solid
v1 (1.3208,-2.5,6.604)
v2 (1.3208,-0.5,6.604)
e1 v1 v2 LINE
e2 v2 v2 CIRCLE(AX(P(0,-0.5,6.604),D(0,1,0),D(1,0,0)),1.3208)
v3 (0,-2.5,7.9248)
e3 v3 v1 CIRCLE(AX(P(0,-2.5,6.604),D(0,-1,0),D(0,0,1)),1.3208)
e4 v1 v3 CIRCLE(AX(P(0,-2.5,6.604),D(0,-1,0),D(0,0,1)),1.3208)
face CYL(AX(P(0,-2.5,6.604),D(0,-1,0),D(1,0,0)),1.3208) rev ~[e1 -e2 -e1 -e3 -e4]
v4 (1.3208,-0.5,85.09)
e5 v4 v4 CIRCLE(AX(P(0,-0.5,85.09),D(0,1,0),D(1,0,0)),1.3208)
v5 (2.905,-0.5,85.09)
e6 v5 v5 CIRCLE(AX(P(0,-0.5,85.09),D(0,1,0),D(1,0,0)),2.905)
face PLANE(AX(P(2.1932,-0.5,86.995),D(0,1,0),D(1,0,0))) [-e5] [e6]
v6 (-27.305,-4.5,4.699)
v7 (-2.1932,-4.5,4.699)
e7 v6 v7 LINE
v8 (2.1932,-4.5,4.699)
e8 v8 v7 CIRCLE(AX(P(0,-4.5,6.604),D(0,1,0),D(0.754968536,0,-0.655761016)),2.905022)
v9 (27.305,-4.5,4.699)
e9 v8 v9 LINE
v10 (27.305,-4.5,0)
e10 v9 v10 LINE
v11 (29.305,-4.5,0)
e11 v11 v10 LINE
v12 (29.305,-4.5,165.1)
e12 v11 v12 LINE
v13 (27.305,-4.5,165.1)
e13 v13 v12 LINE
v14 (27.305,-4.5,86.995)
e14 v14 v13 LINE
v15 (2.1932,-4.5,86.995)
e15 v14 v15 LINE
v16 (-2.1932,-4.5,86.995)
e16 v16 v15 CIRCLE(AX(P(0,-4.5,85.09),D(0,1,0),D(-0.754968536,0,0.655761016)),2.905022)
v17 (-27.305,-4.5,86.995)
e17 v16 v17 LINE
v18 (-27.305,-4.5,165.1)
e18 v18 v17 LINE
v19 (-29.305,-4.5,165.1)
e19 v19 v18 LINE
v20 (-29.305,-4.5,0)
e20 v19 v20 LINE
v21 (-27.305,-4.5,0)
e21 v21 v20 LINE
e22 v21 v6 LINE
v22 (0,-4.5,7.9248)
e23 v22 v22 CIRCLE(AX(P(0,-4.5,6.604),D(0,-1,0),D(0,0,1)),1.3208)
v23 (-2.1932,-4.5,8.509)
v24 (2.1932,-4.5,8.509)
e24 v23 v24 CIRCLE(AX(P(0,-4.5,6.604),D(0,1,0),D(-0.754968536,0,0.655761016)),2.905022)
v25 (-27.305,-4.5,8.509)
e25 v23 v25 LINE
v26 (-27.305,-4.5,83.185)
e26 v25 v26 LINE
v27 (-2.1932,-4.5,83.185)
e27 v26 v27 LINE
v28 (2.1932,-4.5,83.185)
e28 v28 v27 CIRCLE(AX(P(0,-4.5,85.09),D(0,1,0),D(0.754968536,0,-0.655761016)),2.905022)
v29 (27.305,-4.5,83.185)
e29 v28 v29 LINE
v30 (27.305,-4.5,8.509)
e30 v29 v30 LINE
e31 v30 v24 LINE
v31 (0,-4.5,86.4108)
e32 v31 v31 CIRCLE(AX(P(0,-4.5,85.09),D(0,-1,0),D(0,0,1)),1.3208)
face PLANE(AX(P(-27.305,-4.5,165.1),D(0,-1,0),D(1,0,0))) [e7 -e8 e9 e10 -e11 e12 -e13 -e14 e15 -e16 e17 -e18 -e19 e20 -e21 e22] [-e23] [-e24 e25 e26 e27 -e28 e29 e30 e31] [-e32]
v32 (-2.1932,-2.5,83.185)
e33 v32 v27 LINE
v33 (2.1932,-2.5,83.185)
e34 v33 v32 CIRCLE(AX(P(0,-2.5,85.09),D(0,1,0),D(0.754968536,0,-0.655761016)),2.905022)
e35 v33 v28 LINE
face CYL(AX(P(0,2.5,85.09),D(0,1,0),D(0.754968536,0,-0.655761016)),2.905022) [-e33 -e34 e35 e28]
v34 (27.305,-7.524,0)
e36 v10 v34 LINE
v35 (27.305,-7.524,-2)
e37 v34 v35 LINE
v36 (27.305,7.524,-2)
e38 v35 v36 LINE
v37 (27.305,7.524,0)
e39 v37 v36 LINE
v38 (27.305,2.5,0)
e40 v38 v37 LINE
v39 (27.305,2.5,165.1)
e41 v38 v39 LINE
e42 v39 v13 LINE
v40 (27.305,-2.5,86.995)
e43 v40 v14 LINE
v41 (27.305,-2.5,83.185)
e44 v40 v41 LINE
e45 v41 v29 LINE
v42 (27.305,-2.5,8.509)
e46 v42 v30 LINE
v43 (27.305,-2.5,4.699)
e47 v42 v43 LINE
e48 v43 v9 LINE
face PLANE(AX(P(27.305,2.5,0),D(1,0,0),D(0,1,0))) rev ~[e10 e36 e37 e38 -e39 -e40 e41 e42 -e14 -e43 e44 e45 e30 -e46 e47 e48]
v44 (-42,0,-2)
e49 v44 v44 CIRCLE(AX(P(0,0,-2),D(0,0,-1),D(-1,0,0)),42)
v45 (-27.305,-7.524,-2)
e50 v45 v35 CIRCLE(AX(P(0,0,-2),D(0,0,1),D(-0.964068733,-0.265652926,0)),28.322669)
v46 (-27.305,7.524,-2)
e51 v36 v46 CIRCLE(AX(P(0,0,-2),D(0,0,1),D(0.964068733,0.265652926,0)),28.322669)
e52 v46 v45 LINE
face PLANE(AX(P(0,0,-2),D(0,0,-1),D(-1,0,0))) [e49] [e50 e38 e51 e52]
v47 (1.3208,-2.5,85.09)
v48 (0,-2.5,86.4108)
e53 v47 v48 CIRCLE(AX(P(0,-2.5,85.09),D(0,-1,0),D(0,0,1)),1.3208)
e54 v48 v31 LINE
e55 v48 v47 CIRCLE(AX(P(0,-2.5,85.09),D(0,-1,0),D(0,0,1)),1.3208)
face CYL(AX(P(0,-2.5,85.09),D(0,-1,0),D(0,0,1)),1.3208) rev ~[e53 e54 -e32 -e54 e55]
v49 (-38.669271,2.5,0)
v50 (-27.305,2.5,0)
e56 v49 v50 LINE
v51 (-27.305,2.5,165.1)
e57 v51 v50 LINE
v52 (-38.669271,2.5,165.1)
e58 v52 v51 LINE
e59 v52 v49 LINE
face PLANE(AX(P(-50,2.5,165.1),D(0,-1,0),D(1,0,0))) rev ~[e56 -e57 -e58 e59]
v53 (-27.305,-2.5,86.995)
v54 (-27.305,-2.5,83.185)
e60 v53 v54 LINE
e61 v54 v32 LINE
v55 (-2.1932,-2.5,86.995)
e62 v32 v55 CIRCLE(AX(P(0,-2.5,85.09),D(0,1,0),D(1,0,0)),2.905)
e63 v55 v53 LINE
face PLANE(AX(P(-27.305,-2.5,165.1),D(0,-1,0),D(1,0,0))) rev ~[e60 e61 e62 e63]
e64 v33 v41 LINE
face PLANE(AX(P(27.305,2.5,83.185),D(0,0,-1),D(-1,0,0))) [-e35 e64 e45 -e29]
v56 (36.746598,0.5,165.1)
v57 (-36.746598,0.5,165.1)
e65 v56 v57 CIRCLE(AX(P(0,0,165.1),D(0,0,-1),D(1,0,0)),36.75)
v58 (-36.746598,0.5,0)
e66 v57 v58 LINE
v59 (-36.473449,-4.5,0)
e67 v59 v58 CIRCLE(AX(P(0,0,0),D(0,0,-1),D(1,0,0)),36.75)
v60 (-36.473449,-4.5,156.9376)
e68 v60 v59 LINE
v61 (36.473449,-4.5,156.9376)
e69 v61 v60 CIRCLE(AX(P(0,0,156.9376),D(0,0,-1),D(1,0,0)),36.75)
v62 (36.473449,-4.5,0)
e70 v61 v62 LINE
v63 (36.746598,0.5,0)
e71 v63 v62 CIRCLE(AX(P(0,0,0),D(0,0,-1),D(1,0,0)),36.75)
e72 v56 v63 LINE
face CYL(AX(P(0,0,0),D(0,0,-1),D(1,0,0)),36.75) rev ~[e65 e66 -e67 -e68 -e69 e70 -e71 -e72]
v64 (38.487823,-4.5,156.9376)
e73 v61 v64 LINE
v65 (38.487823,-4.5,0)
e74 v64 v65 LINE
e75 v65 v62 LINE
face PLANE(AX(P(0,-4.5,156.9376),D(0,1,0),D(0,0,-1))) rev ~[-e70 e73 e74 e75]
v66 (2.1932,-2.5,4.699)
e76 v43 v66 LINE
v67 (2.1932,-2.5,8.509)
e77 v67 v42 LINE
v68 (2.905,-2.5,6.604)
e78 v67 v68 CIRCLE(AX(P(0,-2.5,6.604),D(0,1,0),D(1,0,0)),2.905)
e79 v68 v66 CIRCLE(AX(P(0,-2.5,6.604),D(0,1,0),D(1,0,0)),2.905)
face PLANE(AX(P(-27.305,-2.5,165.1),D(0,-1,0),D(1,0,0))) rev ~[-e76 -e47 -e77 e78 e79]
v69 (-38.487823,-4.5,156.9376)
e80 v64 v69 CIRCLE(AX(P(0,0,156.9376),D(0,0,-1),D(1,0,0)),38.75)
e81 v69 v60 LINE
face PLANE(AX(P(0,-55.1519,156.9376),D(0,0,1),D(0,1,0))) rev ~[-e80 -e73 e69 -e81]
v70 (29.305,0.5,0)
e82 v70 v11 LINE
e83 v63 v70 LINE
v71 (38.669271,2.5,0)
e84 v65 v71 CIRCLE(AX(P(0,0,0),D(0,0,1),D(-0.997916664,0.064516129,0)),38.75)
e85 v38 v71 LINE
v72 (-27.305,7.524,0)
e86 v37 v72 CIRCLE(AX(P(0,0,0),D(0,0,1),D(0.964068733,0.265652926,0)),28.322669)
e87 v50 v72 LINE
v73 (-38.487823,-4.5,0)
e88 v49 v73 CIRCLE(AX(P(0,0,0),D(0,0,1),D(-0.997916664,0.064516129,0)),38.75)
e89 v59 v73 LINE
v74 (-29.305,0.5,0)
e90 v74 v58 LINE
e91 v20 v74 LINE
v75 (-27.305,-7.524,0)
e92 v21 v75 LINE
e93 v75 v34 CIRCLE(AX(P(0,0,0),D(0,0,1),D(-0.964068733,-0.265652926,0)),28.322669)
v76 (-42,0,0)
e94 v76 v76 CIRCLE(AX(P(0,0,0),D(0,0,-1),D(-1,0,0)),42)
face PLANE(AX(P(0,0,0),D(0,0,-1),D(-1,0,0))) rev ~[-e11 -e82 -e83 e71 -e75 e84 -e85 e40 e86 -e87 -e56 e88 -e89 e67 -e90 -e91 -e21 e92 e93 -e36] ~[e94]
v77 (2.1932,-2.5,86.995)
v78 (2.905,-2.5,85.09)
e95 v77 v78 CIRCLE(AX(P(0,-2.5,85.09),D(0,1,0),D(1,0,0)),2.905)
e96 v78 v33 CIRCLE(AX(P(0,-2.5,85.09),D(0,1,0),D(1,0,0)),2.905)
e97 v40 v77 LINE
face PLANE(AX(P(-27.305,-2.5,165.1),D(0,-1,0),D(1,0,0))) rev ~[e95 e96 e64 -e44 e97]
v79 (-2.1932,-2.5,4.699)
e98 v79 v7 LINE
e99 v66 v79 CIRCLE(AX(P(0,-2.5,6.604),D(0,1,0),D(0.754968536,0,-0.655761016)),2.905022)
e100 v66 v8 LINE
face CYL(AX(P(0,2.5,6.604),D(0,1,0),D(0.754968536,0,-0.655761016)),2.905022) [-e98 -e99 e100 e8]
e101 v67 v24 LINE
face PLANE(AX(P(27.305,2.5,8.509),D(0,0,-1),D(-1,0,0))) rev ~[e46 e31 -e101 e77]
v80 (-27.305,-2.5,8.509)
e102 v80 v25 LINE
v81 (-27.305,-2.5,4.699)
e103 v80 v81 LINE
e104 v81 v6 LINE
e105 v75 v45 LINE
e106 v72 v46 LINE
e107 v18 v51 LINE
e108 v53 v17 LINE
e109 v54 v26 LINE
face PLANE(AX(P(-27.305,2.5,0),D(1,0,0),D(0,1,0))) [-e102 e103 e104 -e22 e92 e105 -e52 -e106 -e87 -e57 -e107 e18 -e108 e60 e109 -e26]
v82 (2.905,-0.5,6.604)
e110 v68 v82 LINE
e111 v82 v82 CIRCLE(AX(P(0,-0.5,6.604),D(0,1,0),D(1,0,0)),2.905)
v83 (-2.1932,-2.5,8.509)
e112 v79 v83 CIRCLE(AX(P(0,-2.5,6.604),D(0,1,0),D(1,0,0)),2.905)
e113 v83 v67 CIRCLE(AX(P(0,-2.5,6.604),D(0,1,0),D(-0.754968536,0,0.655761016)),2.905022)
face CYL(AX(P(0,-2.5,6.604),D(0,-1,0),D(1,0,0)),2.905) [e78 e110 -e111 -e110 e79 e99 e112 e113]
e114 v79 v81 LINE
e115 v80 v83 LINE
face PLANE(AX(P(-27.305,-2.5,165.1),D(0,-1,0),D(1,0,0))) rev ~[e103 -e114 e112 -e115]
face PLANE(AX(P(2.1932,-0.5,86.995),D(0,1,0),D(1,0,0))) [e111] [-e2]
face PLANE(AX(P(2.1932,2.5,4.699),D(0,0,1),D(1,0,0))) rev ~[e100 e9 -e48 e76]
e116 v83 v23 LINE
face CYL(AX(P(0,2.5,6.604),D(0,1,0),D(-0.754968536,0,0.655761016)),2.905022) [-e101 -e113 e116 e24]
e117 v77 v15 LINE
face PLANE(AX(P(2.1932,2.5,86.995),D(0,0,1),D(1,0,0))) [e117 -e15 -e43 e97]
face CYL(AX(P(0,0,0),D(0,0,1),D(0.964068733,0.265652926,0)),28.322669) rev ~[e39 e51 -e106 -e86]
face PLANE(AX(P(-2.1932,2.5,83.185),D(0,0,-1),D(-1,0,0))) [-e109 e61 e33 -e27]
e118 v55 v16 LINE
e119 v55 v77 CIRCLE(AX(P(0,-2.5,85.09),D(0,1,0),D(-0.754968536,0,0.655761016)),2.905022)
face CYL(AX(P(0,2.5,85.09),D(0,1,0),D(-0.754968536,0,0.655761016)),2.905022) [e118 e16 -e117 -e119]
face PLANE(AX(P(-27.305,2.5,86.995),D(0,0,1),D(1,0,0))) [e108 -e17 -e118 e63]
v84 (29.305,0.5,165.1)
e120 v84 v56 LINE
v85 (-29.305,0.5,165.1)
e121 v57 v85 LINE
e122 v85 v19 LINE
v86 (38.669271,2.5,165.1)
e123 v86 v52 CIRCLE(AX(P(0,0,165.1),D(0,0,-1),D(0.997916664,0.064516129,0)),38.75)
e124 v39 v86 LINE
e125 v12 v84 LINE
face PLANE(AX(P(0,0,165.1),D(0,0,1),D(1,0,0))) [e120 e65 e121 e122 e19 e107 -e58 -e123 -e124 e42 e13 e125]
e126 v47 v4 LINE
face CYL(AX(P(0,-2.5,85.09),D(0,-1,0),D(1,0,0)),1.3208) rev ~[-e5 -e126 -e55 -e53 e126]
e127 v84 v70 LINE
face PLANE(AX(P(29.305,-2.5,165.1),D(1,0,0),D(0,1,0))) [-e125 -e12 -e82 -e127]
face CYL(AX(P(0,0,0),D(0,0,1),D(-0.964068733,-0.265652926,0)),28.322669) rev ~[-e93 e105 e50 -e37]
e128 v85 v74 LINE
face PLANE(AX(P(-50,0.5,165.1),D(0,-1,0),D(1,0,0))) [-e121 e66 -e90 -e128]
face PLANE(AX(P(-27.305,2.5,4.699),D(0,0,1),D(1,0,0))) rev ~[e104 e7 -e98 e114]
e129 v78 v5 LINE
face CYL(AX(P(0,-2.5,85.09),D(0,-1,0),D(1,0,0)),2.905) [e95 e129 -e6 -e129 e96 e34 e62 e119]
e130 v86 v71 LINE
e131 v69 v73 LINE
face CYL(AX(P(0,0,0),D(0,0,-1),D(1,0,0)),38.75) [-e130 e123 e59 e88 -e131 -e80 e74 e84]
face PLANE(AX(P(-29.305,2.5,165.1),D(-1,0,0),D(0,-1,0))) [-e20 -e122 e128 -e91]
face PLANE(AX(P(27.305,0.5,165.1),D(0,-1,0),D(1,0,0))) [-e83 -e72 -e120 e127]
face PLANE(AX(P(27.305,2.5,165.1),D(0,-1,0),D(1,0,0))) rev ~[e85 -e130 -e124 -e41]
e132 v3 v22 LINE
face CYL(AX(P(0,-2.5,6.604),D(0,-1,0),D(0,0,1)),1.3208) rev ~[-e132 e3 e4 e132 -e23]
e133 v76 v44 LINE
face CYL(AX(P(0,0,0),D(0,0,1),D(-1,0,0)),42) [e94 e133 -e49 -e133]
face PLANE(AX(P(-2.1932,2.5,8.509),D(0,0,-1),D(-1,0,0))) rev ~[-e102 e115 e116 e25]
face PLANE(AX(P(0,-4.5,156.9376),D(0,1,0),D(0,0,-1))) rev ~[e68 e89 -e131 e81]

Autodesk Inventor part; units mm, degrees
ref_plane "YZ Plane" through (0, 0, 0) normal (1, 0, 0) x (0, 1, 0)
ref_plane "XZ Plane" through (0, 0, 0) normal (0, 1, 0) x (-1, 0, 0)
ref_plane "XY Plane" through (0, 0, 0) normal (0, 0, 1) x (1, 0, 0)
sketch "Sketch1" plane through (0, 0, 0) normal (0, 0, 1) x (1, 0, 0)
  circle A0 centre (0, 0) radius 38.75
  dimension "d0" = 77.5
extrude "Extrusion1" add sketch "Sketch1" along normal blind 165.1
sketch "Sketch2" plane through (0, 0, 165.1) normal (0, 0, 1) x (1, 0, 0)
  line L0 (-27.305, -2.5) -> (27.305, -2.5)
  line L1 (27.305, -2.5) -> (27.305, 2.5)
  line L2 (27.305, 2.5) -> (-27.305, 2.5)
  line L3 (-27.305, 2.5) -> (-27.305, -2.5)
  line L4 (-27.305, -2.5) -> (27.305, 2.5) construction
  line L5 (27.305, -2.5) -> (-27.305, 2.5) construction
  line L6 (0, 2.5) -> (41.5863, 2.5)
  line L7 (41.5863, 2.5) -> (41.5863, 42.5)
  line L8 (41.5863, 42.5) -> (0, 42.5)
  line L9 (0, 42.5) -> (0, 2.5)
  line L10 (0, 42.5) -> (-50, 42.5)
  line L11 (-50, 42.5) -> (-50, 2.5)
  line L12 (-50, 2.5) -> (0, 2.5)
  line L13 (0, 2.5) -> (0, 42.5)
  point P0 (0, 0)
  point P1 (-27.305, 2.5)
  dimension "d3" = 54.61
  dimension "d4" = 5
extrude "Extrusion2" cut sketch "Sketch2" against normal through all
sketch "Sketch3" plane through (0, 0, 0) normal (0, 0, -1) x (-1, 0, 0)
  circle A0 centre (0, 0) radius 42
extrude "Extrusion3" add sketch "Sketch3" along normal blind 2
sketch "Sketch4" plane through (-27.305, -2.5, 165.1) normal (0, 1, 0) x (1, 0, 0)
  line L0 (0, 165.1) -> (54.61, 165.1) projected
  line L1 (0, 0) -> (0, 165.1) projected
  point P0 (27.305, 165.1)
  point P1 (27.305, 158.496)
  dimension "d9" = 6.604
  dimension "d10" = 27.305
hole "Hole1" at (0, -2.5, 6.604) direction (0, -1, 0) diameter 2.6416 depth 10.979 thread size "6-32 UNC" class "2B" standard "ANSI Unified Screw Threads"
sketch "Sketch5" plane through (-27.305, -2.5, 165.1) normal (0, 1, 0) x (1, 0, 0)
  line L0 (0, 165.1) -> (54.61, 165.1) projected
  line L1 (0, 0) -> (0, 165.1) projected
  point P0 (27.305, 165.1)
  point P1 (27.305, 80.01)
  dimension "d18" = 85.09
  dimension "d26" = 27.305
hole "Hole2" at (0, -2.5, 85.09) direction (0, -1, 0) diameter 2.6416 depth 10.979 thread size "6-32 UNC" class "2B" standard "ANSI Unified Screw Threads"
shell "Shell1" thickness 2 removed faces 1 at (1.4054, -14.5066, 165.1)
sketch "Sketch6" plane through (27.305, 2.5, 165.1) normal (0, 1, 0) x (1, 0, 0)
  circle A0 centre (-27.305, 158.496) radius 1.3208 projected
  circle A1 centre (-27.305, 80.01) radius 1.3208 projected
  line L0 (0, 79.02) -> (0, 81)
  line L1 (-54.61, 81) -> (-54.61, 79.02)
  line L2 (0, 160.401) -> (0, 156.591)
  line L3 (-54.61, 156.591) -> (-54.61, 160.401)
  line L4 (-54.61, 160.401) -> (0, 156.591) construction
  line L5 (0, 160.401) -> (-54.61, 156.591) construction
  line L6 (0, 78.105) -> (0, 81.915)
  line L7 (-54.61, 81.915) -> (-54.61, 78.105)
  line L8 (-54.61, 78.105) -> (0, 81.915) construction
  line L9 (0, 78.105) -> (-54.61, 81.915) construction
  line L10 (-54.61, 165.1) -> (0, 165.1)
  line L11 (0, 165.1) -> (0, 0)
  line L12 (0, 0) -> (-54.61, 0)
  line L13 (-54.61, 0) -> (-54.61, 165.1)
  arc A2 (-25.1118, 160.401) -> (-29.4982, 160.401) centre (-27.305, 158.496) ccw
  arc A3 (-29.4982, 156.591) -> (-25.1118, 156.591) centre (-27.305, 158.496) ccw
  line L14 (-54.61, 160.401) -> (-29.4982, 160.401)
  line L15 (-25.1118, 160.401) -> (0, 160.401)
  line L16 (0, 156.591) -> (-25.1118, 156.591)
  line L17 (-29.4982, 156.591) -> (-54.61, 156.591)
  line L18 (0, 81.915) -> (-25.1118, 81.915)
  line L19 (-29.4982, 81.915) -> (-54.61, 81.915)
  line L20 (-54.61, 78.105) -> (-29.4982, 78.105)
  line L21 (-25.1118, 78.105) -> (0, 78.105)
  arc A4 (-25.1118, 81.915) -> (-29.4982, 81.915) centre (-27.305, 80.01) ccw
  arc A5 (-29.4982, 78.105) -> (-25.1118, 78.105) centre (-27.305, 80.01) ccw
  point P0 (-27.305, 165.1)
extrude "Extrusion4" cut sketch "Sketch6" against normal blind 12.5 contours L11 L12 L13 L20 A5 L21 | L18 A4 L19 L13 L17 A3 L16 L11 | L15 A2 L14 L13 L10 L11
sketch "Sketch7" plane through (0, 0, 0) normal (1, 0, 0) x (0, 1, 0)
  line L0 (-4.5, 165.1) -> (-4.5, 0) projected
  line L1 (-4.5, 0) -> (-49, 0)
  line L2 (0.5, 0) -> (-4.5, 0) projected
  line L3 (-4.5, 0) -> (-55.1519, 0)
  line L4 (-55.1519, 0) -> (-55.1519, 156.9376)
  line L5 (-55.1519, 156.9376) -> (-4.5, 156.9376)
  line L6 (-4.5, 156.9376) -> (-4.5, 0)
  line L7 (-4.5, 0) -> (-56.1519, 0)
  line L8 (-56.1519, 0) -> (-56.1519, 0)
  line L9 (-56.1519, 0) -> (-4.5, 0)
  line L10 (-4.5, 0) -> (-4.5, 0)
  point P0 (0, 0)
  point P1 (-4.5, 156.9376)
  point P2 (-55.1519, 1)
  point P3 (-4.5, 0)
extrude "Extrusion5" cut sketch "Sketch7" along normal through all both and the other way through all
sketch "Sketch9" plane through (0, 0, 0) normal (0, 0, 1) x (1, 0, 0)
  line L0 (-27.305, -4.5) -> (-27.305, 2.5) projected
  line L1 (-27.305, -1) -> (-27.305, 7.524)
  line L2 (-27.305, -4.5) -> (-27.305, -7.524)
  line L3 (27.305, 2.5) -> (27.305, -4.5) projected
  line L4 (27.305, -1) -> (27.305, 7.524)
  line L5 (27.305, 7.524) -> (27.305, -7.524)
  arc A0 (-27.305, -7.524) -> (27.305, -7.524) centre (0, 0) ccw
  arc A1 (27.305, 7.524) -> (-27.305, 7.524) centre (0, 0) ccw
  point P0 (-27.305, 2.5)
extrude "Extrusion7" cut sketch "Sketch9" against normal blind 2.5
sketch "Sketch14" plane through (2.1932, -2.5, 86.995) normal (0, 1, 0) x (1, 0, 0)
  circle A0 centre (-2.1932, 80.391) radius 1.3208 projected
  circle A1 centre (-2.1932, 80.391) radius 1.3208
  circle A2 centre (-2.1932, 80.391) radius 2.905
  circle A3 centre (-2.1932, 1.905) radius 1.3208 projected
  circle A4 centre (-2.1932, 1.905) radius 1.3208
  circle A5 centre (-2.1932, 1.905) radius 2.905
  point P0 (-2.1932, 86.995)
extrude "Extrusion10" add sketch "Sketch14" along normal blind 2
properties part number "Revised Mount"
